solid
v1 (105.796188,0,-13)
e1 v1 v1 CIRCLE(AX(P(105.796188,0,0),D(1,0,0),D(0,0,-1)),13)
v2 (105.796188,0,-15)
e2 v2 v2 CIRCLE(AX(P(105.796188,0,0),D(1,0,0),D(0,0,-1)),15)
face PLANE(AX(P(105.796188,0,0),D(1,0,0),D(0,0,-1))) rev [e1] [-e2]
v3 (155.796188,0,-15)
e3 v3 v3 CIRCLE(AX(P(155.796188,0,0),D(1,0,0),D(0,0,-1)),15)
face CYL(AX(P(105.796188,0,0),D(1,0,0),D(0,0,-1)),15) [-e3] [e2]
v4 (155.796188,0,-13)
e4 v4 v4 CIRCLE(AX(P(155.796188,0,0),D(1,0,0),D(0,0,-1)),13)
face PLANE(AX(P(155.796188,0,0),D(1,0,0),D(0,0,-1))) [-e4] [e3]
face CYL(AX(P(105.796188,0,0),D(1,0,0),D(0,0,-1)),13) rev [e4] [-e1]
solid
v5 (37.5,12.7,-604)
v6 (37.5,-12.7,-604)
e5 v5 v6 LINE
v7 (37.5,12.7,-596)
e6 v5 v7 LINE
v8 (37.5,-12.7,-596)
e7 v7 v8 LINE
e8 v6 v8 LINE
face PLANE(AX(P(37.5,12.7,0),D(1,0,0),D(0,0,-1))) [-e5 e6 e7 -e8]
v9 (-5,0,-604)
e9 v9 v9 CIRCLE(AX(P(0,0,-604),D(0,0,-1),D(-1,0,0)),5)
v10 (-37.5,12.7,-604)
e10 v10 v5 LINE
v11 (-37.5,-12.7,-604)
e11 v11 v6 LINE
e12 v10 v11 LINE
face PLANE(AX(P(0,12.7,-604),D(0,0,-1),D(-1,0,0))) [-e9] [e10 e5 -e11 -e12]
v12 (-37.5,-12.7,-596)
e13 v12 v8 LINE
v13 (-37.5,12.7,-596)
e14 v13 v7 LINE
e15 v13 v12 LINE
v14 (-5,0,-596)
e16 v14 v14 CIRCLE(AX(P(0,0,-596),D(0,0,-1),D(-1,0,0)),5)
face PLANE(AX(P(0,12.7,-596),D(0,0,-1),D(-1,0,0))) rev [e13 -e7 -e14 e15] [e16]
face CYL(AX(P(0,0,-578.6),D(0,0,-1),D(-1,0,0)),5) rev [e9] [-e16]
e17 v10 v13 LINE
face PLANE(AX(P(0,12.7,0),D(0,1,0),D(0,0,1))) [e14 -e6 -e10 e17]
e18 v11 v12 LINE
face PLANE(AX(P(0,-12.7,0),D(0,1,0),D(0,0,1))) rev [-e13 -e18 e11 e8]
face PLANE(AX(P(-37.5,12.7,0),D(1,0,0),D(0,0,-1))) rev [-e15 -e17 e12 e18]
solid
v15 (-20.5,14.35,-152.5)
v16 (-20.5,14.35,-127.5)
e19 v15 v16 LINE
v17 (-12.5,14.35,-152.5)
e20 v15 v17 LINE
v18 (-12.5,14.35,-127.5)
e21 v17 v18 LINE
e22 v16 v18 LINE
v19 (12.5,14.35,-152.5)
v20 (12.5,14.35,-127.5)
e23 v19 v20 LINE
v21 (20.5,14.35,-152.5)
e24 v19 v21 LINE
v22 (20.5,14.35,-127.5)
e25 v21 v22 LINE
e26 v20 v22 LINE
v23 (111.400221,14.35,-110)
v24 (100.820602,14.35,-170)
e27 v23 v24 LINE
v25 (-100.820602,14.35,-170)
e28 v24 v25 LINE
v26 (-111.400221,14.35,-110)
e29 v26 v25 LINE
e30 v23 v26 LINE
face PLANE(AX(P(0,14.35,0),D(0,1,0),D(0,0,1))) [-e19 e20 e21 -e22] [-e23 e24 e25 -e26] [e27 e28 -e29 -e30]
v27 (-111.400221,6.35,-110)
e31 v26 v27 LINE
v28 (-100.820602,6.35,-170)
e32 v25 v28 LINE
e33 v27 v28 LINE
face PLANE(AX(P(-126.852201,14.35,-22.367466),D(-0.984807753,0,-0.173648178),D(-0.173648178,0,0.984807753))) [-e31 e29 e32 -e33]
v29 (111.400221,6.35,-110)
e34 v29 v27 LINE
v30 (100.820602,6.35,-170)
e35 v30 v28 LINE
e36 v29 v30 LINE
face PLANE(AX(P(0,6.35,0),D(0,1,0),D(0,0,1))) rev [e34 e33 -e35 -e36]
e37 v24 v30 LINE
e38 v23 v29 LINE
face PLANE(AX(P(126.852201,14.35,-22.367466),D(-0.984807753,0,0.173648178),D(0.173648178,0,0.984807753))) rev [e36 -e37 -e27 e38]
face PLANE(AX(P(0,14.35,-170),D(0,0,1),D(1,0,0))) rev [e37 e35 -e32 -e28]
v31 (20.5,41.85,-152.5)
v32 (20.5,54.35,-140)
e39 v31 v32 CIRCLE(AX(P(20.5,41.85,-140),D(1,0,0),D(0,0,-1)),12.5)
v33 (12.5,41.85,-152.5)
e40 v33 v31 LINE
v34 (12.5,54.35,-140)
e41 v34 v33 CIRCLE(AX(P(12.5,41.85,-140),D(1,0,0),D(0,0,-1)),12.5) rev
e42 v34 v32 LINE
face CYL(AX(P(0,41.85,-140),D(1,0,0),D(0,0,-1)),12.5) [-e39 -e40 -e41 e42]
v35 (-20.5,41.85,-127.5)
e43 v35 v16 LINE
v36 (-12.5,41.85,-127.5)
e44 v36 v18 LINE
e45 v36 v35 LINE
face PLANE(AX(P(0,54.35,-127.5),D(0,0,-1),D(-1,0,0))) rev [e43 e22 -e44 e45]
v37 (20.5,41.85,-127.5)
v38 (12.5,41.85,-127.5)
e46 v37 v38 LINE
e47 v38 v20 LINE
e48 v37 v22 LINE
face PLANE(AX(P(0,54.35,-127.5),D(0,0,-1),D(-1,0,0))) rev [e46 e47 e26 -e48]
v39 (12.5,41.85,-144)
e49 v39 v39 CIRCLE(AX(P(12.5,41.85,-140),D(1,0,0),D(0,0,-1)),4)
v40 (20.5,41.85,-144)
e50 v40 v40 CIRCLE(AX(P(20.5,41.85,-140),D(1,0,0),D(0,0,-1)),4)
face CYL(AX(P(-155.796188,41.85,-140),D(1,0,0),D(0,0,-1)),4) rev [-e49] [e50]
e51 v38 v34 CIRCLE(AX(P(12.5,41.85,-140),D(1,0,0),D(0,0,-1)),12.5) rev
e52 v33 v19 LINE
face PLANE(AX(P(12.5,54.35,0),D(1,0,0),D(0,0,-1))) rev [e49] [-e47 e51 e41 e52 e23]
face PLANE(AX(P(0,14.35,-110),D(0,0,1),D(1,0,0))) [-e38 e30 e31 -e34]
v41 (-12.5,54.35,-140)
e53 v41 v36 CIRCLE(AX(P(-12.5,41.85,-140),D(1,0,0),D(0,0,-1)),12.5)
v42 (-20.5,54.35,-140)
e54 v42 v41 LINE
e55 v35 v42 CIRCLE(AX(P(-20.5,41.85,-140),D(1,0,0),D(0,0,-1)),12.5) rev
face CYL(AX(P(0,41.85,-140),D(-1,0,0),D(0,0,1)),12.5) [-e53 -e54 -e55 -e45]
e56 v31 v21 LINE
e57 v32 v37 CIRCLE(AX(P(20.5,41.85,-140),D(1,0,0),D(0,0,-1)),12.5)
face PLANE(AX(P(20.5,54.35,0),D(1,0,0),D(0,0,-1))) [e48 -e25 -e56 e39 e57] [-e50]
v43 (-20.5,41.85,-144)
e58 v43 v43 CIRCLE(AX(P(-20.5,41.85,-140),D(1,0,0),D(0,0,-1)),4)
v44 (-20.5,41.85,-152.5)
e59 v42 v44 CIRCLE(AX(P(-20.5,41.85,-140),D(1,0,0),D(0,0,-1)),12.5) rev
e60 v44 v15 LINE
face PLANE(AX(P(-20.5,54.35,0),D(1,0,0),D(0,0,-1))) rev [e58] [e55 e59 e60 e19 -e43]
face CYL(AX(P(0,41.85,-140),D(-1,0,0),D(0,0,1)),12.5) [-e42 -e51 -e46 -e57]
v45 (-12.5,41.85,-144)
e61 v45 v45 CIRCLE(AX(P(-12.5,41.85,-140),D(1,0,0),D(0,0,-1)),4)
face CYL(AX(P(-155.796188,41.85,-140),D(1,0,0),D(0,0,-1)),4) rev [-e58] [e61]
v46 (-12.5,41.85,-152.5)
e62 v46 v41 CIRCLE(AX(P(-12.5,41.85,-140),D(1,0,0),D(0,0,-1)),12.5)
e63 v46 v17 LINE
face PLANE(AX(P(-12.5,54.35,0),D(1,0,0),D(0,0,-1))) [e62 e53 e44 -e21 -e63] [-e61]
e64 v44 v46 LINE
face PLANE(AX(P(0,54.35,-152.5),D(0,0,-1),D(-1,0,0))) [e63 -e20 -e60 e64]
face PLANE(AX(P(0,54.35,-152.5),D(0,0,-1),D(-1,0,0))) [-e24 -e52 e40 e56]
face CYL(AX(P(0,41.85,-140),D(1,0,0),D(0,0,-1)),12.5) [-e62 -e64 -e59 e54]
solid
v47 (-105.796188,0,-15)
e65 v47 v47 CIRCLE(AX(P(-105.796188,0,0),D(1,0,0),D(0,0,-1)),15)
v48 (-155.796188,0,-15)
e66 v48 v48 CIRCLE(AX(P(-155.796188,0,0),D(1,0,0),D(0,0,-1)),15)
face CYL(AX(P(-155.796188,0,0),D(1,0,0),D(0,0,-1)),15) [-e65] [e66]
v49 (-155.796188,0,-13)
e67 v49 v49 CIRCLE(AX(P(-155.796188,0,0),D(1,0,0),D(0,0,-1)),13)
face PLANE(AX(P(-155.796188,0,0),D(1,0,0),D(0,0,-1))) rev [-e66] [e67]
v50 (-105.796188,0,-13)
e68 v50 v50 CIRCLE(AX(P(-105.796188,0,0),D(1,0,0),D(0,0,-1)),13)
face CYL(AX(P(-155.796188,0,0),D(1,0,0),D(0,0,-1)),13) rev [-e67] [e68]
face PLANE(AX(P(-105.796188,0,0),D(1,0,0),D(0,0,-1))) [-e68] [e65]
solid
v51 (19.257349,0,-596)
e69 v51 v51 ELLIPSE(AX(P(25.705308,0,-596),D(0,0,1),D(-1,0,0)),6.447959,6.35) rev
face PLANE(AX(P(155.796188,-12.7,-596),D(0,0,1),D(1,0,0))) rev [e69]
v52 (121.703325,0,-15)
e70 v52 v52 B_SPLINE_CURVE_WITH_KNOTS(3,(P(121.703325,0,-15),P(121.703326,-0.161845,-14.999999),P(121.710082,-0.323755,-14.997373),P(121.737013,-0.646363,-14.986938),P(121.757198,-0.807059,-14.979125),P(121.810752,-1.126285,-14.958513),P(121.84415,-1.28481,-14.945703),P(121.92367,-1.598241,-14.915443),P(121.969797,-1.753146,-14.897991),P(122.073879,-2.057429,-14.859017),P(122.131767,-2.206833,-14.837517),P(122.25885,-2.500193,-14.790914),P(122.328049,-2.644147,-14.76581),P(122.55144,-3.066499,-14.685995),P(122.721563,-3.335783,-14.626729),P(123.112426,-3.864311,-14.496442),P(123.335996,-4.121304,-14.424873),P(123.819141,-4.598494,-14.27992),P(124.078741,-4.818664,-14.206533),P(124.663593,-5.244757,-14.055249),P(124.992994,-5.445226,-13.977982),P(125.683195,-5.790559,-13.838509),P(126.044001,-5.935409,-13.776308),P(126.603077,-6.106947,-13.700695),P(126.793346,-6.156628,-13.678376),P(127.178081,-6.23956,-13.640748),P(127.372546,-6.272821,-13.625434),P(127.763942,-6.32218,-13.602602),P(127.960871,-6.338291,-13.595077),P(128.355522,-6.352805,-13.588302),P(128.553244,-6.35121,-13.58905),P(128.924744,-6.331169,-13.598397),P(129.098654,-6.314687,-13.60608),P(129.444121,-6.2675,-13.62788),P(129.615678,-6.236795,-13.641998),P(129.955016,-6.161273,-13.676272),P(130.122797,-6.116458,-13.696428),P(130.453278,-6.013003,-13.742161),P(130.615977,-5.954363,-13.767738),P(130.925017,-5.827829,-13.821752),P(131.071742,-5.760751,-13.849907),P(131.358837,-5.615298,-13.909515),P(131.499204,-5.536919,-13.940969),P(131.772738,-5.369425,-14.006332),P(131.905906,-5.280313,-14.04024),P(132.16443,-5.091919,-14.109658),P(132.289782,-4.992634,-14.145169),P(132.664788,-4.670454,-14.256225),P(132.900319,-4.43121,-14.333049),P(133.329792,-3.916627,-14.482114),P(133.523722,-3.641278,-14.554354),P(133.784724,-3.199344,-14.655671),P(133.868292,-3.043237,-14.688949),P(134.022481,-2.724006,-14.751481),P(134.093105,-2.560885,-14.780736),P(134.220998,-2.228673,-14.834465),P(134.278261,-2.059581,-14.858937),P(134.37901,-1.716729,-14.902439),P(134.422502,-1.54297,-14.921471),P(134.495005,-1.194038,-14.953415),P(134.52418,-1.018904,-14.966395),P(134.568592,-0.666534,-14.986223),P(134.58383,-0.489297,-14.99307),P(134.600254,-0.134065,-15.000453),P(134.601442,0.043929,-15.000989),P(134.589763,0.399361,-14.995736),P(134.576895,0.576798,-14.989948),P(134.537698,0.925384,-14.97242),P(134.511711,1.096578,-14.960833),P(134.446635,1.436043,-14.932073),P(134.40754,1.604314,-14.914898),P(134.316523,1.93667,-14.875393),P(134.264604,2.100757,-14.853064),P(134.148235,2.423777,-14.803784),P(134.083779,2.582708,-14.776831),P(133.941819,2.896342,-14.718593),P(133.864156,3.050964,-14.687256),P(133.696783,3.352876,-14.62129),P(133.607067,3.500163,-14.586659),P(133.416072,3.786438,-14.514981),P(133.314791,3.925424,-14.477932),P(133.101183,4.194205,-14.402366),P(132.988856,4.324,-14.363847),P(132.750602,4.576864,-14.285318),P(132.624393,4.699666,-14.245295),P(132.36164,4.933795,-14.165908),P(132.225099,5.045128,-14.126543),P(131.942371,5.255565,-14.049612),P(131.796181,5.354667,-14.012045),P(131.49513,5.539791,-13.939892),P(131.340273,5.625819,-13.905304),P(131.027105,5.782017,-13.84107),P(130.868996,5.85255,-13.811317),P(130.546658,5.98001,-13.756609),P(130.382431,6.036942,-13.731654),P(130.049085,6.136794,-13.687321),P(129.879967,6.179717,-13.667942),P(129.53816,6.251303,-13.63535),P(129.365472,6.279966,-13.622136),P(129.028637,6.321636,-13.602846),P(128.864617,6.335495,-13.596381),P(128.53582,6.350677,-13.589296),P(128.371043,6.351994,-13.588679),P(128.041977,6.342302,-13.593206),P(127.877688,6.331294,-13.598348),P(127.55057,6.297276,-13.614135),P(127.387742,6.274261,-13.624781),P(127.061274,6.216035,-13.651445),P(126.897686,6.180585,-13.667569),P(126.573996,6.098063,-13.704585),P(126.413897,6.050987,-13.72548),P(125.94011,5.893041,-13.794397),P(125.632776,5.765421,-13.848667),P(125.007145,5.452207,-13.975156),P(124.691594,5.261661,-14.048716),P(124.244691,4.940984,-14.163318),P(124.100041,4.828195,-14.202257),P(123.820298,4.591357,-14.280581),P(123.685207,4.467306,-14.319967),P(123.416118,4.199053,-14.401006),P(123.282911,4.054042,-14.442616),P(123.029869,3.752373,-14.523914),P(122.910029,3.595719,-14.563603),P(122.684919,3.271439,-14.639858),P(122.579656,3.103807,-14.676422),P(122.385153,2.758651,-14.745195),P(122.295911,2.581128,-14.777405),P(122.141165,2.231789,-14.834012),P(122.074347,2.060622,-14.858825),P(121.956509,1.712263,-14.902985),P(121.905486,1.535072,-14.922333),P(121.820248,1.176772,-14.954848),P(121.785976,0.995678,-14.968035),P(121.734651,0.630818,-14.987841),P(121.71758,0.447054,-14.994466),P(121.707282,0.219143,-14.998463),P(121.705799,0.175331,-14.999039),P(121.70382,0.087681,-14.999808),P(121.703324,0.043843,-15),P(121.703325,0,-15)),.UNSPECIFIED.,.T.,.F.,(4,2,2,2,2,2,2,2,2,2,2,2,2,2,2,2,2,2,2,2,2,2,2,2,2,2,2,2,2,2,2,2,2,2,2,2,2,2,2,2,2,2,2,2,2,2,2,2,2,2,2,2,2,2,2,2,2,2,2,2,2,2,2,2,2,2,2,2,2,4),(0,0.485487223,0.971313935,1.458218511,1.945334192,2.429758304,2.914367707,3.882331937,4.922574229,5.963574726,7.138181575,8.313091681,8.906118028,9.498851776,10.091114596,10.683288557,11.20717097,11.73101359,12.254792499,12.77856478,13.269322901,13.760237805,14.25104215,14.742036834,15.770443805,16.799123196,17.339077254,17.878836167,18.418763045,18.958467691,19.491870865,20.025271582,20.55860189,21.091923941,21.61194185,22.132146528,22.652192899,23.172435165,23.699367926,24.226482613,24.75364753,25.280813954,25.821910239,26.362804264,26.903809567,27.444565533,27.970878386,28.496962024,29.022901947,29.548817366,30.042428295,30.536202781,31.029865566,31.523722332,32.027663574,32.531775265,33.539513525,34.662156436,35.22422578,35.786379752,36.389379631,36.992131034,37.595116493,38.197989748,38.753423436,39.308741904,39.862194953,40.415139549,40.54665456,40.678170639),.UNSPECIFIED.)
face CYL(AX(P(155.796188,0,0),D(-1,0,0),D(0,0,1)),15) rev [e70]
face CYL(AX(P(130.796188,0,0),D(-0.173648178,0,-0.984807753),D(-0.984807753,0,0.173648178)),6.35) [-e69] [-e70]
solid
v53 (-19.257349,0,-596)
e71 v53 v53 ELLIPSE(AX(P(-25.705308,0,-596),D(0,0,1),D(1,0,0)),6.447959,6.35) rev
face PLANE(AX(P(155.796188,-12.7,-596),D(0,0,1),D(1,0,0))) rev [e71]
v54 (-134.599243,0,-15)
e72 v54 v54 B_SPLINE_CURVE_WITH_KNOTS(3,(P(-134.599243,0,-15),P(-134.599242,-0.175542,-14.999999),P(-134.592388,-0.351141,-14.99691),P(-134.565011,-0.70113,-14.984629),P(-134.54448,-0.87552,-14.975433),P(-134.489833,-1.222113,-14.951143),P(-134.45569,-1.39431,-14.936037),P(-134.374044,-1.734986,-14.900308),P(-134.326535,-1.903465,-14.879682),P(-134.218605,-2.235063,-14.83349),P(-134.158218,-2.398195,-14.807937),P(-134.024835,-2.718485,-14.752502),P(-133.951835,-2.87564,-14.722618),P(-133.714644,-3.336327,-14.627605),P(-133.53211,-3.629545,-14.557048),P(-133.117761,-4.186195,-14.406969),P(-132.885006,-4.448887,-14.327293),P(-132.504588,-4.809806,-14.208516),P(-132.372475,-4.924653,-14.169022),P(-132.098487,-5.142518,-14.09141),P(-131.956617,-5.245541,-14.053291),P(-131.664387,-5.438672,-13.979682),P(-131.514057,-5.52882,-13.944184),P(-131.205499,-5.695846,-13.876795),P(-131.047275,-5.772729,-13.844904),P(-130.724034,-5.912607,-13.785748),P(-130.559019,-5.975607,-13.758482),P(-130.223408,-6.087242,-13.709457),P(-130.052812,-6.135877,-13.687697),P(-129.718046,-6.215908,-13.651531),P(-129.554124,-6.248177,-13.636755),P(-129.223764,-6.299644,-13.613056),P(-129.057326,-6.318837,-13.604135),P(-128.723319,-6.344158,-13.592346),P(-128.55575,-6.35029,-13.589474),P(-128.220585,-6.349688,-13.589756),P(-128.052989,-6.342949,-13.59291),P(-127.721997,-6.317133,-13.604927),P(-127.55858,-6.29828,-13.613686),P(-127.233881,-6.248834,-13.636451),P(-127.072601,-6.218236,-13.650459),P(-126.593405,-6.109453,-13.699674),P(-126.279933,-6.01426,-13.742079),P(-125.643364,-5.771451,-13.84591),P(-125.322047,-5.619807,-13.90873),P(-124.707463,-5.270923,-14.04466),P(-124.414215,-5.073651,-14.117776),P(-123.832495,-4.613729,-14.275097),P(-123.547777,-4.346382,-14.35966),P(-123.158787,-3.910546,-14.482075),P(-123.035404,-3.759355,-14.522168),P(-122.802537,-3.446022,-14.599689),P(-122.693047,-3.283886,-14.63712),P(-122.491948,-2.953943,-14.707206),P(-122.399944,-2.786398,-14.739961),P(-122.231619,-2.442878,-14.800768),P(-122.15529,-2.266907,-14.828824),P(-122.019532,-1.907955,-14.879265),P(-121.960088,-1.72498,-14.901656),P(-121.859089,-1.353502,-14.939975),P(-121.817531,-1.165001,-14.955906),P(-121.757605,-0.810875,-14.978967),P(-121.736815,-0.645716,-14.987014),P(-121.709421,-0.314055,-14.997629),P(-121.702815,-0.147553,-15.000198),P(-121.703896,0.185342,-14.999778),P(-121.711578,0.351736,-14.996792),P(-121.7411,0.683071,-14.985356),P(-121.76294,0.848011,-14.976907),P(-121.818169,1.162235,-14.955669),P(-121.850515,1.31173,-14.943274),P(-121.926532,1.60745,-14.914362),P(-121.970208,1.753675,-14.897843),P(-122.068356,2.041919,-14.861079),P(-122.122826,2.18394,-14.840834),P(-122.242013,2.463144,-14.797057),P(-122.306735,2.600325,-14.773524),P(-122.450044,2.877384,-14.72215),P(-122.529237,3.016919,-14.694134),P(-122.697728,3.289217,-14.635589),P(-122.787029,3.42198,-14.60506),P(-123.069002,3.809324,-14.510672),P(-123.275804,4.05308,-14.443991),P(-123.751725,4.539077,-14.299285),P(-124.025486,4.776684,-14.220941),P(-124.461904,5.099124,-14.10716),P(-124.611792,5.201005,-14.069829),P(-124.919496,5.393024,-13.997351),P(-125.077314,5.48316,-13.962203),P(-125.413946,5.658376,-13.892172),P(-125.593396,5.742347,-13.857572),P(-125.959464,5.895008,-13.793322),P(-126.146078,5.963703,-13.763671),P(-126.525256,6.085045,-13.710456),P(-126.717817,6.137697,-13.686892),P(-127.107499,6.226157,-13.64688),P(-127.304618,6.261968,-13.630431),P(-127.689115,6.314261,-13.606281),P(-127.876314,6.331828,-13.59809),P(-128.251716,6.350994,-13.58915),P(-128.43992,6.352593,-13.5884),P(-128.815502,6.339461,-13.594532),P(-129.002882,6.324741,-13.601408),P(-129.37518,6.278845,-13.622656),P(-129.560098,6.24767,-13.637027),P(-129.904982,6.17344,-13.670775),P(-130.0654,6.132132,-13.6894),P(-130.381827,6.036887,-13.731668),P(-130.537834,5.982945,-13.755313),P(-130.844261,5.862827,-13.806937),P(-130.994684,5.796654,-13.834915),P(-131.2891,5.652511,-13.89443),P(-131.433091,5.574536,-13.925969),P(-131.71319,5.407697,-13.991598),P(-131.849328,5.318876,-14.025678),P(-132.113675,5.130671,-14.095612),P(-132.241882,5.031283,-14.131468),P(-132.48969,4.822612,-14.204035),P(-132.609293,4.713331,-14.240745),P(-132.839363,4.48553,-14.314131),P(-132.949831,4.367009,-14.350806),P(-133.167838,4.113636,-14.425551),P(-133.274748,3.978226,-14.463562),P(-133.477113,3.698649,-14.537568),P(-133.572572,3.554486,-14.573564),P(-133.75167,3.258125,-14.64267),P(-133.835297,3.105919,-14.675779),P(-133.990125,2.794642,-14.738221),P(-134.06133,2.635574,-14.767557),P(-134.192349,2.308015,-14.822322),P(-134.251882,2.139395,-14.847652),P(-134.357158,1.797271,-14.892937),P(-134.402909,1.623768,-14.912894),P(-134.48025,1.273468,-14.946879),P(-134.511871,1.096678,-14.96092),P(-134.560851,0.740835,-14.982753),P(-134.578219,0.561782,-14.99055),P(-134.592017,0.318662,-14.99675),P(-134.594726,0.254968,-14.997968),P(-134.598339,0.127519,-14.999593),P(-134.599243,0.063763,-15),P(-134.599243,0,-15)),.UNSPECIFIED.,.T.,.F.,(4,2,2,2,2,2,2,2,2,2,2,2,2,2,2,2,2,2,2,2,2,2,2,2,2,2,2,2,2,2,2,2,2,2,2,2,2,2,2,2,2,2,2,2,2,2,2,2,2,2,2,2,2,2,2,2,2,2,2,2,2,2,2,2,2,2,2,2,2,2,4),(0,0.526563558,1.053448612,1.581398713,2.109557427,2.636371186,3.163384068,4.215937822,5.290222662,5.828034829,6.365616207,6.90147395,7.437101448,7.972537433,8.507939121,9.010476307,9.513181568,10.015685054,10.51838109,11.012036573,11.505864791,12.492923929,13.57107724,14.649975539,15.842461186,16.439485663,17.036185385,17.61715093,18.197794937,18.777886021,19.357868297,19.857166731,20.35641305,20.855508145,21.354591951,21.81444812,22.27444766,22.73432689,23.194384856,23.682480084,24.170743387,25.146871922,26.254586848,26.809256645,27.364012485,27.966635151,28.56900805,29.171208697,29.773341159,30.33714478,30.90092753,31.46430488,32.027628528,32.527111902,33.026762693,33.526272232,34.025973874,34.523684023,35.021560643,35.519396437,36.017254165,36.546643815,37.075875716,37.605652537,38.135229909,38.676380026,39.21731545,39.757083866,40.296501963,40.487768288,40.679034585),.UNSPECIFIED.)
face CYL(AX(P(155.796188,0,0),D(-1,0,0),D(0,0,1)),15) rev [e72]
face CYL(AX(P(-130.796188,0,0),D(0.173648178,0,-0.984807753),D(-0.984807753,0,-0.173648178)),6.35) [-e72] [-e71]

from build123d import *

# Parameters (mm, degrees)
SWEEP2_PROFILE_R        = 6.35
SWEEP3_PROFILE_R        = 6.35
SWEEP_THIN2_PROFILE_R   = 15
SWEEP_THIN2_PROFILE_R_2 = 13
SWEEP_THIN3_PROFILE_R   = 15
SWEEP_THIN3_PROFILE_R_2 = 13
SKETCH161_W             = 75
SKETCH161_H             = 8
BOSS_EXTRUDE1_DEPTH     = 12.7
SKETCH164_W             = 8
SKETCH164_H             = 25.4
CUT_EXTRUDE1_DEPTH      = 635.353542167
SKETCH165_R             = 15
CUT_EXTRUDE2_DEPTH      = 680.802036854
SKETCH166_R             = 5
CUT_EXTRUDE3_DEPTH      = 25.4
BOSS_EXTRUDE2_DEPTH     = 8
SKETCH168_W             = 8
SKETCH168_H             = 25
BOSS_EXTRUDE3_DEPTH     = 40
FILLET1_R               = 12.5
SKETCH170_R             = 4
CUT_EXTRUDE4_DEPTH      = 632.545935426


with BuildPart() as part:
    # Sweep2: sweep along a path in Sketch1
    with BuildLine(Plane(origin=(0, 0, 0), x_dir=(1, 0, 0), z_dir=(0, 1, 0))) as sweep2_path:
        Line((130.796188425, 0), (25, 600))
    # Sweep2 profile (on start of the path) → Sweep2 (sweep)
    with BuildSketch(Plane(origin=(130.796188425, 0, 0), x_dir=(-0.9848077530122079, 0, 0.17364817766693125), z_dir=(-0.17364817766693125, 0, -0.9848077530122079))):
        Circle(SWEEP2_PROFILE_R)
    sweep(path=sweep2_path.line)


with BuildPart() as body_2:
    # Sweep3: sweep along a path in Sketch78
    with BuildLine(Plane(origin=(0, 0, 0), x_dir=(1, 0, 0), z_dir=(0, 1, 0))) as sweep3_path:
        Line((-130.796188425, 0), (-25, 600))
    # Sweep3 profile (on start of the path) → Sweep3 (sweep)
    with BuildSketch(Plane(origin=(-130.796188425, 0, 0), x_dir=(-0.9848077530122079, 0, -0.17364817766693125), z_dir=(0.17364817766693125, 0, -0.9848077530122079))):
        Circle(SWEEP3_PROFILE_R)
    sweep(path=sweep3_path.line)


with BuildPart() as body_3:
    # Sweep-Thin2: sweep along a path in Sketch87
    with BuildLine(Plane(origin=(0, 0, 0), x_dir=(1, 0, 0), z_dir=(0, 1, 0))) as sweep_thin2_path:
        Line((-155.796188425, 0), (-105.796188425, 0))
    # Sweep-Thin2 profile (on start of the path) → Sweep-Thin2 (sweep)
    with BuildSketch(Plane(origin=(-155.796188425, 0, 0), x_dir=(0, 0, 1), z_dir=(1, 0, 0))):
        Circle(SWEEP_THIN2_PROFILE_R)
        Circle(SWEEP_THIN2_PROFILE_R_2, mode=Mode.SUBTRACT)
    sweep(path=sweep_thin2_path.line)


with BuildPart() as body_4:
    # Sweep-Thin3: sweep along a path in Sketch140
    with BuildLine(Plane(origin=(0, 0, 0), x_dir=(1, 0, 0), z_dir=(0, 1, 0))) as sweep_thin3_path:
        Line((105.796188425, 0), (155.796188425, 0))
    # Sweep-Thin3 profile (on start of the path) → Sweep-Thin3 (sweep)
    with BuildSketch(Plane(origin=(105.796188425, 0, 0), x_dir=(0, 0, 1), z_dir=(1, 0, 0))):
        Circle(SWEEP_THIN3_PROFILE_R)
        Circle(SWEEP_THIN3_PROFILE_R_2, mode=Mode.SUBTRACT)
    sweep(path=sweep_thin3_path.line)


with BuildPart() as body_5:
    # Sketch161 → Boss-Extrude1 (new, symmetric)
    with BuildSketch(Plane(origin=(0, 0, 0), x_dir=(1, 0, 0), z_dir=(0, 1, 0))):
        with Locations((0, 600)):
            Rectangle(SKETCH161_W, SKETCH161_H)
    extrude(amount=BOSS_EXTRUDE1_DEPTH, both=True)

    # Sketch166 → Cut-Extrude3 (cut)
    with BuildSketch(Plane(origin=(0, 0, -604), x_dir=(-1, 0, 0), z_dir=(0, 0, -1))):
        Circle(SKETCH166_R)
    extrude(amount=-CUT_EXTRUDE3_DEPTH, mode=Mode.SUBTRACT)


with BuildPart() as cut_extrude1_tool:
    # Sketch164 → Cut-Extrude1 (new, through all)
    with BuildSketch(Plane.ZY.offset(37.5)):
        with Locations((-600, 0)):
            Rectangle(SKETCH164_W, SKETCH164_H)
    extrude(amount=-CUT_EXTRUDE1_DEPTH)


with BuildPart() as body_2_1:
    add(body_2.part)

    # Cut-Extrude1: cut by cut_extrude1_tool
    add(cut_extrude1_tool.part, mode=Mode.SUBTRACT)


with BuildPart() as part_1:
    add(part.part)

    # Cut-Extrude1: cut by cut_extrude1_tool
    add(cut_extrude1_tool.part, mode=Mode.SUBTRACT)


with BuildPart() as cut_extrude2_tool:
    # Sketch165 → Cut-Extrude2 (new, through all)
    with BuildSketch(Plane.ZY.offset(155.796188425)):
        with Locations(Location((0, 0, 0), (0, 0, 180))):
            Circle(SKETCH165_R)
    extrude(amount=-CUT_EXTRUDE2_DEPTH)


with BuildPart() as body_2_2:
    add(body_2_1.part)

    # Cut-Extrude2: cut by cut_extrude2_tool
    add(cut_extrude2_tool.part, mode=Mode.SUBTRACT)


with BuildPart() as part_2:
    add(part_1.part)

    # Cut-Extrude2: cut by cut_extrude2_tool
    add(cut_extrude2_tool.part, mode=Mode.SUBTRACT)


with BuildPart() as body_6:
    # Sketch167 → Boss-Extrude2 (new body)
    with BuildSketch(Plane(origin=(0, 6.35, 0), x_dir=(1, 0, 0), z_dir=(0, 1, 0))):
        Polygon((-111.400220547, 110), (111.400220547, 110), (100.820601705, 170), (-100.820601705, 170), align=None)
    extrude(amount=BOSS_EXTRUDE2_DEPTH)

    # Sketch168 → Boss-Extrude3 (add)
    with BuildSketch(Plane(origin=(0, 14.35, 0), x_dir=(1, 0, 0), z_dir=(0, 1, 0))):
        with Locations((-16.5, 140)):
            Rectangle(SKETCH168_W, SKETCH168_H)
        with Locations((16.5, 140)):
            Rectangle(SKETCH168_W, SKETCH168_H)
    extrude(amount=BOSS_EXTRUDE3_DEPTH)

    # Fillet1
    fillet1_edges = [body_6.edges().sort_by_distance(p)[0] for p in [
        (16.5, 54.35, -152.5),
        (16.5, 54.35, -127.5),
        (-16.5, 54.35, -152.5),
        (-16.5, 54.35, -127.5),
    ]]
    fillet(fillet1_edges, radius=FILLET1_R - 0.0001)  # a hair under: the kernel refuses the full size

    # Sketch170 → Cut-Extrude4 (cut, through all)
    with BuildSketch(Plane(origin=(20.5, 0, 0), x_dir=(0, 0, -1), z_dir=(1, 0, 0))):
        with Locations((140, 41.85)):
            Circle(SKETCH170_R)
    extrude(amount=-CUT_EXTRUDE4_DEPTH, mode=Mode.SUBTRACT)


solid = Compound([body_3.part, body_4.part, body_5.part, body_2_2.part, part_2.part, body_6.part])
